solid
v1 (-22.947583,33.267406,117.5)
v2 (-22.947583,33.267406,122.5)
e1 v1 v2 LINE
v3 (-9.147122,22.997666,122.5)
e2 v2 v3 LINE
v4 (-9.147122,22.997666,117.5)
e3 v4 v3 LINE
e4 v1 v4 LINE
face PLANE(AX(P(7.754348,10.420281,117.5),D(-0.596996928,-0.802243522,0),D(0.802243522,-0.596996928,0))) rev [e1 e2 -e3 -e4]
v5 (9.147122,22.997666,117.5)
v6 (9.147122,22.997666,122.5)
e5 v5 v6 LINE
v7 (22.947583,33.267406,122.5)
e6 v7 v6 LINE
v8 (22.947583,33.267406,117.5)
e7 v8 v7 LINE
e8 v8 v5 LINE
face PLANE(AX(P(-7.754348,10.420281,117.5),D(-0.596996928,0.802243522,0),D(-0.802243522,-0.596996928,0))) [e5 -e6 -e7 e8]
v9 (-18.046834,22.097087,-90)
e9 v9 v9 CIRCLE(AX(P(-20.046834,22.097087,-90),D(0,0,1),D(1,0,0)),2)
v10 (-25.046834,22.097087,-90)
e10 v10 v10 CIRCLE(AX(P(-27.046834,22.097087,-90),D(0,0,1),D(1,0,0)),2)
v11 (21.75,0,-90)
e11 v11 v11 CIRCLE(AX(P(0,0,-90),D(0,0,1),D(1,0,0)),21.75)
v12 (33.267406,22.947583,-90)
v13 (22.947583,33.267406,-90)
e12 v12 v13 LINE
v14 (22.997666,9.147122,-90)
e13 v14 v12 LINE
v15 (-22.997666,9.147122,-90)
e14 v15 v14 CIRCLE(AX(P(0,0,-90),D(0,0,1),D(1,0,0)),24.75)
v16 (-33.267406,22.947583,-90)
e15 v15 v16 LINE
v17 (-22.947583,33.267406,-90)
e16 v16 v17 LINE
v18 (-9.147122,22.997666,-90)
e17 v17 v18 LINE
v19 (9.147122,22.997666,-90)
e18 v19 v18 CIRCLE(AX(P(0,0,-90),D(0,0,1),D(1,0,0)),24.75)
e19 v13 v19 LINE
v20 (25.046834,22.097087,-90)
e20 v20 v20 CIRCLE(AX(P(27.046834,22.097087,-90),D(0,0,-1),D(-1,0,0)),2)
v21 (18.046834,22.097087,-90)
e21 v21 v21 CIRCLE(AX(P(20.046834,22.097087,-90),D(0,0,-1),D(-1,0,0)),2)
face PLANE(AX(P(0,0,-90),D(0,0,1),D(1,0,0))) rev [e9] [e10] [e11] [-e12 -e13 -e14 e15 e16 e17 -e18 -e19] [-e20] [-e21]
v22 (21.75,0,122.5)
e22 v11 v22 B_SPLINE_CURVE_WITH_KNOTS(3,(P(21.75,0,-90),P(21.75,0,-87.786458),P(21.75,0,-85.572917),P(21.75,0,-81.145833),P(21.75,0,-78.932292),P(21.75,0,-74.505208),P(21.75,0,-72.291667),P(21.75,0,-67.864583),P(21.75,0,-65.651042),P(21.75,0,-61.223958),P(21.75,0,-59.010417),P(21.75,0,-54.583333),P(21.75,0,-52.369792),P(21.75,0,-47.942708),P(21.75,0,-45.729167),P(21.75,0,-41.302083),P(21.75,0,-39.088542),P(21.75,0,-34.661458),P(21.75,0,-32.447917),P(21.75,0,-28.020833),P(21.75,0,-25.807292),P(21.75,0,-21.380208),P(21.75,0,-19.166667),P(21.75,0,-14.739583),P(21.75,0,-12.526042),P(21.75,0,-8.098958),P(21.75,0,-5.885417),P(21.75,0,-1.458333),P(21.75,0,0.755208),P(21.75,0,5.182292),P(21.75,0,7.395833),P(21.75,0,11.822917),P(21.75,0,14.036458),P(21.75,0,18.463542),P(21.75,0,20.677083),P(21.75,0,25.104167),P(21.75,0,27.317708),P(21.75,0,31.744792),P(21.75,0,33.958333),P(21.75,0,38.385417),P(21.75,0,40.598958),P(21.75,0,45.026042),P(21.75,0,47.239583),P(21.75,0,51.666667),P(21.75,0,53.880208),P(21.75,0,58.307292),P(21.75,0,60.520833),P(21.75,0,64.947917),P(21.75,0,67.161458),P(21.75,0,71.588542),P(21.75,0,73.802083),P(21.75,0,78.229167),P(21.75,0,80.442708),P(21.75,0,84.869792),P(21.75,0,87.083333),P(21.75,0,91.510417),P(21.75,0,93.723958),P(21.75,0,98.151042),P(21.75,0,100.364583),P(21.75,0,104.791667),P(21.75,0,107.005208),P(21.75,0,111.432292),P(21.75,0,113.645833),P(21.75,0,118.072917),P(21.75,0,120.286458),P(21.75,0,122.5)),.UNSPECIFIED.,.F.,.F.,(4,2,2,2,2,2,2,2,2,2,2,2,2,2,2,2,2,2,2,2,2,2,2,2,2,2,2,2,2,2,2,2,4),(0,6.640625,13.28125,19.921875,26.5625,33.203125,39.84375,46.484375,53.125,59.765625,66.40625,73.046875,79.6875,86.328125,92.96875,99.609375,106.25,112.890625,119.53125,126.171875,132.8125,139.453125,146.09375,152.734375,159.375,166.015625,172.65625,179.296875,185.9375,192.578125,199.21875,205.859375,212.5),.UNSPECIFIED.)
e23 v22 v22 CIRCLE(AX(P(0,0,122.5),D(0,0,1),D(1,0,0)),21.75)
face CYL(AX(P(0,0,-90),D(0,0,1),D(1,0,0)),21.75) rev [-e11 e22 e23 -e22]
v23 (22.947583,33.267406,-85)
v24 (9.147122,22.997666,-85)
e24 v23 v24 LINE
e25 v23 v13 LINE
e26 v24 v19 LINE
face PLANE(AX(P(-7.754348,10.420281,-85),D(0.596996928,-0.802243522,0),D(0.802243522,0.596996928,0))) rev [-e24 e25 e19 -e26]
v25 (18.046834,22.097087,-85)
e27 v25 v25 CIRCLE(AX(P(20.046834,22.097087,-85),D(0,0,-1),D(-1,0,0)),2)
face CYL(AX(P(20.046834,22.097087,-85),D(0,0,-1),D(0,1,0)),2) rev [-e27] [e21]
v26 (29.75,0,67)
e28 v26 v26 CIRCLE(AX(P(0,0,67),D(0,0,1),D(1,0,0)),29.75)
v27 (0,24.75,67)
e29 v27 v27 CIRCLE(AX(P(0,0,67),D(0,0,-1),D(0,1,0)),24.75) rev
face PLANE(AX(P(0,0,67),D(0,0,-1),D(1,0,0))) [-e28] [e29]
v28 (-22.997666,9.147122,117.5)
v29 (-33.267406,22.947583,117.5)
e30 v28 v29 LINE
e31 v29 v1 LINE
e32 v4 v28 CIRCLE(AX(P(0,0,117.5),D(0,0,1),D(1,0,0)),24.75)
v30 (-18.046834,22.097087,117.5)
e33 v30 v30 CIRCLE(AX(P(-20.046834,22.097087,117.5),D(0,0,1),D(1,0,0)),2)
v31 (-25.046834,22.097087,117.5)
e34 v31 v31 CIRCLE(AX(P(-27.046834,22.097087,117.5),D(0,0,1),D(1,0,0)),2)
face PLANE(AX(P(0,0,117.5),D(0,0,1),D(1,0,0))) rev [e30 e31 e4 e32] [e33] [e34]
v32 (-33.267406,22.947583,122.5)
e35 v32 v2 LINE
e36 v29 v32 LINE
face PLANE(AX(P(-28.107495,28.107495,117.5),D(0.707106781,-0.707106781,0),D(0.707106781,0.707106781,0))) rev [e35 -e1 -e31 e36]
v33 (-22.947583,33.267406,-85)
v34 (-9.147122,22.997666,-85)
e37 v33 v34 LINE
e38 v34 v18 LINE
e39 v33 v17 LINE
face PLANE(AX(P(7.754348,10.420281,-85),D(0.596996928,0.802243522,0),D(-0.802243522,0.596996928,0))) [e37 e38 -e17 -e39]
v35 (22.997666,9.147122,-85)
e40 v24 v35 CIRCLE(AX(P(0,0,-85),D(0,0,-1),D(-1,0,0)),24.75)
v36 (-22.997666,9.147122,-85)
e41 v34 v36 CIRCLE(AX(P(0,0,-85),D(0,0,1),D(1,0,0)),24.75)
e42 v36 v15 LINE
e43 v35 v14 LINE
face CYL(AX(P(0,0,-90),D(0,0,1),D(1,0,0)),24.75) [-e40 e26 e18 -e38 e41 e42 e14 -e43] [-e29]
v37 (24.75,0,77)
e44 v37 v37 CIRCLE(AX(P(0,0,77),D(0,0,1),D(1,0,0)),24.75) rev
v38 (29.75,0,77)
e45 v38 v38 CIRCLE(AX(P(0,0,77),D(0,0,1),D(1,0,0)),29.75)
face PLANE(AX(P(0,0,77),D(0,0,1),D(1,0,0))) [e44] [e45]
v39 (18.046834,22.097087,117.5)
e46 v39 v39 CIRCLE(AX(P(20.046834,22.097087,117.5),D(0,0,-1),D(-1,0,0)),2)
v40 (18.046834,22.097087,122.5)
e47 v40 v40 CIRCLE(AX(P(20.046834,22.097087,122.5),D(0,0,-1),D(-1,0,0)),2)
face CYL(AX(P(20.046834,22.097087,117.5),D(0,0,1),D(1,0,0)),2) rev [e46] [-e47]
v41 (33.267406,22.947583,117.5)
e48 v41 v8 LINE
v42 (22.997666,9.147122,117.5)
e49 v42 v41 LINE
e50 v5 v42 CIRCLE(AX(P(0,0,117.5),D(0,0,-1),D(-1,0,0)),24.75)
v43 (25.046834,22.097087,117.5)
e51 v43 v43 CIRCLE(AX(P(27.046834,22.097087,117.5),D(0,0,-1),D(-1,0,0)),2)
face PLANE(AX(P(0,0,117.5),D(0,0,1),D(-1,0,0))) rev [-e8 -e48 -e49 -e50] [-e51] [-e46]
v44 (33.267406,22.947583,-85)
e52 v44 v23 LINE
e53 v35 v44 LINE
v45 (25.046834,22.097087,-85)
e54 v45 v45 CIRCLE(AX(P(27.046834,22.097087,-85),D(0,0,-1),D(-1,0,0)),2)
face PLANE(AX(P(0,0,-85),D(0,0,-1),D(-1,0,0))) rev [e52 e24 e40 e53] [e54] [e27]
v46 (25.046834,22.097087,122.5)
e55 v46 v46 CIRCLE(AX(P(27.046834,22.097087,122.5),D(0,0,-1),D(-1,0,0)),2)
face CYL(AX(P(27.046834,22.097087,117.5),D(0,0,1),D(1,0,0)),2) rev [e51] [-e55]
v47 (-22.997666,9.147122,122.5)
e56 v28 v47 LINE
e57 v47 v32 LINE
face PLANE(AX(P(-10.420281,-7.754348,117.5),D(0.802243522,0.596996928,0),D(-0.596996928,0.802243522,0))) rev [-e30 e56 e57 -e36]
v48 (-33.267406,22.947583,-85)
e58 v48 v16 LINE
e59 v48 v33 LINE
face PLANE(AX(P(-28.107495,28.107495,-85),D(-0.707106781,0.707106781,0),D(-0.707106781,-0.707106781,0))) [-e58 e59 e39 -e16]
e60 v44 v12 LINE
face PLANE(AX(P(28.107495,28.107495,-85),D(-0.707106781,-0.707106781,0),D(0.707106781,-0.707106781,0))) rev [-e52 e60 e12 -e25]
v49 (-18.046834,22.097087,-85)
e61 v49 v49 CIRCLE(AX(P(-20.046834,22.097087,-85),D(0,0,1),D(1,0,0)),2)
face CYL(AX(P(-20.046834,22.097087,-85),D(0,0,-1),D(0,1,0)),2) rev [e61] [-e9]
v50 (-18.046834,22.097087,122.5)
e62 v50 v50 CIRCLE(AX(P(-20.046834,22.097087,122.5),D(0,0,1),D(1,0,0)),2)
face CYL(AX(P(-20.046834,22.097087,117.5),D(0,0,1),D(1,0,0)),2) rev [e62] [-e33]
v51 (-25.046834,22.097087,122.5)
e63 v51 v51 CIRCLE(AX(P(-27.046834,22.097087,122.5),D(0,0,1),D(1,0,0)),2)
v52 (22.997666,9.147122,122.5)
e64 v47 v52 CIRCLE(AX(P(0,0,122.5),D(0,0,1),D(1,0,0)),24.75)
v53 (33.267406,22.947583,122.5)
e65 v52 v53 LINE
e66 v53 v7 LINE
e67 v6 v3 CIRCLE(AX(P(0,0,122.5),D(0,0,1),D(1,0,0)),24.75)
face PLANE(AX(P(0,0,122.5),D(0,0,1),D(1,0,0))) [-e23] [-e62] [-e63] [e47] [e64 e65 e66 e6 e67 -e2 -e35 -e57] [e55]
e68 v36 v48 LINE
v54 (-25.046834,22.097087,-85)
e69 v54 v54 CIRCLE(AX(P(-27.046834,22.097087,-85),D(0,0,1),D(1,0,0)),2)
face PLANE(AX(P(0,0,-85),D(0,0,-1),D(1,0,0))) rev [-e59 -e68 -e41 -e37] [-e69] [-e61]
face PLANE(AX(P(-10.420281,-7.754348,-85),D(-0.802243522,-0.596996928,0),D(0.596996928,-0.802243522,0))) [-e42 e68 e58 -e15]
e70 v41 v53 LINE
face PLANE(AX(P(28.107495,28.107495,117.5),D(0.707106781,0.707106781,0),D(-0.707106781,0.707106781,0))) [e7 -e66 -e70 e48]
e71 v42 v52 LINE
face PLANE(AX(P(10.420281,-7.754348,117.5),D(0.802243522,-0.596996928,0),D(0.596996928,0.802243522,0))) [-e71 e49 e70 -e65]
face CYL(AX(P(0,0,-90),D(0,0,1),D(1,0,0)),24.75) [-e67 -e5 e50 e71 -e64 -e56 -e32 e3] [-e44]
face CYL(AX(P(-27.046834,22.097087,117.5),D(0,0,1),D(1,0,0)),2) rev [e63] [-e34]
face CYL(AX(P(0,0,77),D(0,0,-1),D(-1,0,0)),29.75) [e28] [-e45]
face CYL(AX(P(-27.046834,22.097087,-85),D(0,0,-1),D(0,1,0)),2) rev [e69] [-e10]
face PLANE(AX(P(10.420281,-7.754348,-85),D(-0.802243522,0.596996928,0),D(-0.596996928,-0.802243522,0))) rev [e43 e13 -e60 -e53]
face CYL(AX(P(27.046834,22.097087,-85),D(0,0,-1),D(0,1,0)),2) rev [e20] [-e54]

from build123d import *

# Parameters (mm, degrees)
BOSS_EXTRUDE1_DEPTH      = 120
BOSS_EXTRUDE1_DEPTH_BACK = 90
SKETCH1_R                = 24.75
SKETCH1_R_2              = 21.75
BOSS_EXTRUDE3_START      = 72
SKETCH5_R                = 29.75
SKETCH5_R_2              = 21.75
BOSS_EXTRUDE3_DEPTH      = 5
SKETCH7_R                = 24.75
SKETCH7_R_2              = 21.75
BOSS_EXTRUDE4_DEPTH      = 2.5
BOSS_EXTRUDE5_START      = -5
SKETCH6_R                = 2
BOSS_EXTRUDE5_DEPTH      = 5
MIRROR2_START            = 67
MIRROR2_OUTLINE_R        = 29.75
MIRROR2_OUTLINE_R_2      = 24.75
MIRROR2_DEPTH            = 5
MIRROR2_START_2          = -90
MIRROR2_2_OUTLINE_R      = 2
MIRROR2_2_DEPTH          = 5


# Read off the part's stored shape, not the designer's step: Mirror2
with BuildPart() as part:
    # Sketch1 → Boss-Extrude1 (new, two sides: drawn at the far end of the back side and taken through both)
    with BuildSketch(Plane.XY.offset(-BOSS_EXTRUDE1_DEPTH_BACK)):
        Circle(SKETCH1_R)
        Circle(SKETCH1_R_2, mode=Mode.SUBTRACT)
    extrude(amount=BOSS_EXTRUDE1_DEPTH + BOSS_EXTRUDE1_DEPTH_BACK)

    # Sketch5 → Boss-Extrude3 (add)
    with BuildSketch(Plane.XY.offset(BOSS_EXTRUDE3_START)):
        Circle(SKETCH5_R)
        Circle(SKETCH5_R_2, mode=Mode.SUBTRACT)
    extrude(amount=BOSS_EXTRUDE3_DEPTH)

    # Sketch7 → Boss-Extrude4 (add, symmetric)
    with BuildSketch(Plane.XY.offset(120)):
        Circle(SKETCH7_R)
        Circle(SKETCH7_R_2, mode=Mode.SUBTRACT)
    extrude(amount=BOSS_EXTRUDE4_DEPTH, both=True)

    # Sketch6 → Boss-Extrude5 (add)
    with BuildSketch(Plane.XY.offset(122.5).offset(BOSS_EXTRUDE5_START)):
        with BuildLine():
            Line((-22.997666259, 9.147122314), (-33.267406372, 22.947582732))
            Line((-33.267406372, 22.947582732), (-22.947582732, 33.267406372))
            Line((-22.947582732, 33.267406372), (-9.147122314, 22.997666259))
            ThreePointArc((-9.147122314, 22.997666259), (-17.500892834, 17.500892834), (-22.997666259, 9.147122314))
        make_face()
        with Locations((-20.04683438, 22.097086912)):
            Circle(SKETCH6_R, mode=Mode.SUBTRACT)
        with Locations((-27.04683438, 22.097086912)):
            Circle(SKETCH6_R, mode=Mode.SUBTRACT)
    boss_extrude5 = extrude(amount=BOSS_EXTRUDE5_DEPTH)

    # Mirror1: Boss-Extrude5 across plane
    add(boss_extrude5.mirror(Plane(origin=(0, 0, 0), x_dir=(0, 0, 1), z_dir=(1, 0, 0))))

    # Mirror2 outline → Mirror2 (add)
    with BuildSketch(Plane.XY.offset(MIRROR2_START)):
        Circle(MIRROR2_OUTLINE_R)
        Circle(MIRROR2_OUTLINE_R_2, mode=Mode.SUBTRACT)
    extrude(amount=MIRROR2_DEPTH)

    # Mirror2 2 outline → Mirror2 2 (add)
    # profile 1 of 2: a face of its own
    with BuildSketch(Plane.XY.offset(MIRROR2_START_2)):
        with BuildLine():
            Line((22.997666259, 9.147122314), (33.267406372, 22.947582732))
            Line((33.267406372, 22.947582732), (22.947582732, 33.267406372))
            Line((22.947582732, 33.267406372), (9.147122314, 22.997666259))
            ThreePointArc((9.147122314, 22.997666259), (17.500892834, 17.500892834), (22.997666259, 9.147122314))
        make_face()
        with Locations((20.04683438, 22.097086912)):
            Circle(MIRROR2_2_OUTLINE_R, mode=Mode.SUBTRACT)
        with Locations((27.04683438, 22.097086912)):
            Circle(MIRROR2_2_OUTLINE_R, mode=Mode.SUBTRACT)
    # profile 2 of 2: a face of its own
    with BuildSketch(Plane.XY.offset(MIRROR2_START_2)):
        with BuildLine():
            Line((-33.267406372, 22.947582732), (-22.997666259, 9.147122314))
            ThreePointArc((-22.997666259, 9.147122314), (-17.500892834, 17.500892834), (-9.147122314, 22.997666259))
            Line((-9.147122314, 22.997666259), (-22.947582732, 33.267406372))
            Line((-22.947582732, 33.267406372), (-33.267406372, 22.947582732))
        make_face()
        with Locations((-20.04683438, 22.097086912)):
            Circle(MIRROR2_2_OUTLINE_R, mode=Mode.SUBTRACT)
        with Locations((-27.04683438, 22.097086912)):
            Circle(MIRROR2_2_OUTLINE_R, mode=Mode.SUBTRACT)
    extrude(amount=MIRROR2_2_DEPTH)


solid = part.part
